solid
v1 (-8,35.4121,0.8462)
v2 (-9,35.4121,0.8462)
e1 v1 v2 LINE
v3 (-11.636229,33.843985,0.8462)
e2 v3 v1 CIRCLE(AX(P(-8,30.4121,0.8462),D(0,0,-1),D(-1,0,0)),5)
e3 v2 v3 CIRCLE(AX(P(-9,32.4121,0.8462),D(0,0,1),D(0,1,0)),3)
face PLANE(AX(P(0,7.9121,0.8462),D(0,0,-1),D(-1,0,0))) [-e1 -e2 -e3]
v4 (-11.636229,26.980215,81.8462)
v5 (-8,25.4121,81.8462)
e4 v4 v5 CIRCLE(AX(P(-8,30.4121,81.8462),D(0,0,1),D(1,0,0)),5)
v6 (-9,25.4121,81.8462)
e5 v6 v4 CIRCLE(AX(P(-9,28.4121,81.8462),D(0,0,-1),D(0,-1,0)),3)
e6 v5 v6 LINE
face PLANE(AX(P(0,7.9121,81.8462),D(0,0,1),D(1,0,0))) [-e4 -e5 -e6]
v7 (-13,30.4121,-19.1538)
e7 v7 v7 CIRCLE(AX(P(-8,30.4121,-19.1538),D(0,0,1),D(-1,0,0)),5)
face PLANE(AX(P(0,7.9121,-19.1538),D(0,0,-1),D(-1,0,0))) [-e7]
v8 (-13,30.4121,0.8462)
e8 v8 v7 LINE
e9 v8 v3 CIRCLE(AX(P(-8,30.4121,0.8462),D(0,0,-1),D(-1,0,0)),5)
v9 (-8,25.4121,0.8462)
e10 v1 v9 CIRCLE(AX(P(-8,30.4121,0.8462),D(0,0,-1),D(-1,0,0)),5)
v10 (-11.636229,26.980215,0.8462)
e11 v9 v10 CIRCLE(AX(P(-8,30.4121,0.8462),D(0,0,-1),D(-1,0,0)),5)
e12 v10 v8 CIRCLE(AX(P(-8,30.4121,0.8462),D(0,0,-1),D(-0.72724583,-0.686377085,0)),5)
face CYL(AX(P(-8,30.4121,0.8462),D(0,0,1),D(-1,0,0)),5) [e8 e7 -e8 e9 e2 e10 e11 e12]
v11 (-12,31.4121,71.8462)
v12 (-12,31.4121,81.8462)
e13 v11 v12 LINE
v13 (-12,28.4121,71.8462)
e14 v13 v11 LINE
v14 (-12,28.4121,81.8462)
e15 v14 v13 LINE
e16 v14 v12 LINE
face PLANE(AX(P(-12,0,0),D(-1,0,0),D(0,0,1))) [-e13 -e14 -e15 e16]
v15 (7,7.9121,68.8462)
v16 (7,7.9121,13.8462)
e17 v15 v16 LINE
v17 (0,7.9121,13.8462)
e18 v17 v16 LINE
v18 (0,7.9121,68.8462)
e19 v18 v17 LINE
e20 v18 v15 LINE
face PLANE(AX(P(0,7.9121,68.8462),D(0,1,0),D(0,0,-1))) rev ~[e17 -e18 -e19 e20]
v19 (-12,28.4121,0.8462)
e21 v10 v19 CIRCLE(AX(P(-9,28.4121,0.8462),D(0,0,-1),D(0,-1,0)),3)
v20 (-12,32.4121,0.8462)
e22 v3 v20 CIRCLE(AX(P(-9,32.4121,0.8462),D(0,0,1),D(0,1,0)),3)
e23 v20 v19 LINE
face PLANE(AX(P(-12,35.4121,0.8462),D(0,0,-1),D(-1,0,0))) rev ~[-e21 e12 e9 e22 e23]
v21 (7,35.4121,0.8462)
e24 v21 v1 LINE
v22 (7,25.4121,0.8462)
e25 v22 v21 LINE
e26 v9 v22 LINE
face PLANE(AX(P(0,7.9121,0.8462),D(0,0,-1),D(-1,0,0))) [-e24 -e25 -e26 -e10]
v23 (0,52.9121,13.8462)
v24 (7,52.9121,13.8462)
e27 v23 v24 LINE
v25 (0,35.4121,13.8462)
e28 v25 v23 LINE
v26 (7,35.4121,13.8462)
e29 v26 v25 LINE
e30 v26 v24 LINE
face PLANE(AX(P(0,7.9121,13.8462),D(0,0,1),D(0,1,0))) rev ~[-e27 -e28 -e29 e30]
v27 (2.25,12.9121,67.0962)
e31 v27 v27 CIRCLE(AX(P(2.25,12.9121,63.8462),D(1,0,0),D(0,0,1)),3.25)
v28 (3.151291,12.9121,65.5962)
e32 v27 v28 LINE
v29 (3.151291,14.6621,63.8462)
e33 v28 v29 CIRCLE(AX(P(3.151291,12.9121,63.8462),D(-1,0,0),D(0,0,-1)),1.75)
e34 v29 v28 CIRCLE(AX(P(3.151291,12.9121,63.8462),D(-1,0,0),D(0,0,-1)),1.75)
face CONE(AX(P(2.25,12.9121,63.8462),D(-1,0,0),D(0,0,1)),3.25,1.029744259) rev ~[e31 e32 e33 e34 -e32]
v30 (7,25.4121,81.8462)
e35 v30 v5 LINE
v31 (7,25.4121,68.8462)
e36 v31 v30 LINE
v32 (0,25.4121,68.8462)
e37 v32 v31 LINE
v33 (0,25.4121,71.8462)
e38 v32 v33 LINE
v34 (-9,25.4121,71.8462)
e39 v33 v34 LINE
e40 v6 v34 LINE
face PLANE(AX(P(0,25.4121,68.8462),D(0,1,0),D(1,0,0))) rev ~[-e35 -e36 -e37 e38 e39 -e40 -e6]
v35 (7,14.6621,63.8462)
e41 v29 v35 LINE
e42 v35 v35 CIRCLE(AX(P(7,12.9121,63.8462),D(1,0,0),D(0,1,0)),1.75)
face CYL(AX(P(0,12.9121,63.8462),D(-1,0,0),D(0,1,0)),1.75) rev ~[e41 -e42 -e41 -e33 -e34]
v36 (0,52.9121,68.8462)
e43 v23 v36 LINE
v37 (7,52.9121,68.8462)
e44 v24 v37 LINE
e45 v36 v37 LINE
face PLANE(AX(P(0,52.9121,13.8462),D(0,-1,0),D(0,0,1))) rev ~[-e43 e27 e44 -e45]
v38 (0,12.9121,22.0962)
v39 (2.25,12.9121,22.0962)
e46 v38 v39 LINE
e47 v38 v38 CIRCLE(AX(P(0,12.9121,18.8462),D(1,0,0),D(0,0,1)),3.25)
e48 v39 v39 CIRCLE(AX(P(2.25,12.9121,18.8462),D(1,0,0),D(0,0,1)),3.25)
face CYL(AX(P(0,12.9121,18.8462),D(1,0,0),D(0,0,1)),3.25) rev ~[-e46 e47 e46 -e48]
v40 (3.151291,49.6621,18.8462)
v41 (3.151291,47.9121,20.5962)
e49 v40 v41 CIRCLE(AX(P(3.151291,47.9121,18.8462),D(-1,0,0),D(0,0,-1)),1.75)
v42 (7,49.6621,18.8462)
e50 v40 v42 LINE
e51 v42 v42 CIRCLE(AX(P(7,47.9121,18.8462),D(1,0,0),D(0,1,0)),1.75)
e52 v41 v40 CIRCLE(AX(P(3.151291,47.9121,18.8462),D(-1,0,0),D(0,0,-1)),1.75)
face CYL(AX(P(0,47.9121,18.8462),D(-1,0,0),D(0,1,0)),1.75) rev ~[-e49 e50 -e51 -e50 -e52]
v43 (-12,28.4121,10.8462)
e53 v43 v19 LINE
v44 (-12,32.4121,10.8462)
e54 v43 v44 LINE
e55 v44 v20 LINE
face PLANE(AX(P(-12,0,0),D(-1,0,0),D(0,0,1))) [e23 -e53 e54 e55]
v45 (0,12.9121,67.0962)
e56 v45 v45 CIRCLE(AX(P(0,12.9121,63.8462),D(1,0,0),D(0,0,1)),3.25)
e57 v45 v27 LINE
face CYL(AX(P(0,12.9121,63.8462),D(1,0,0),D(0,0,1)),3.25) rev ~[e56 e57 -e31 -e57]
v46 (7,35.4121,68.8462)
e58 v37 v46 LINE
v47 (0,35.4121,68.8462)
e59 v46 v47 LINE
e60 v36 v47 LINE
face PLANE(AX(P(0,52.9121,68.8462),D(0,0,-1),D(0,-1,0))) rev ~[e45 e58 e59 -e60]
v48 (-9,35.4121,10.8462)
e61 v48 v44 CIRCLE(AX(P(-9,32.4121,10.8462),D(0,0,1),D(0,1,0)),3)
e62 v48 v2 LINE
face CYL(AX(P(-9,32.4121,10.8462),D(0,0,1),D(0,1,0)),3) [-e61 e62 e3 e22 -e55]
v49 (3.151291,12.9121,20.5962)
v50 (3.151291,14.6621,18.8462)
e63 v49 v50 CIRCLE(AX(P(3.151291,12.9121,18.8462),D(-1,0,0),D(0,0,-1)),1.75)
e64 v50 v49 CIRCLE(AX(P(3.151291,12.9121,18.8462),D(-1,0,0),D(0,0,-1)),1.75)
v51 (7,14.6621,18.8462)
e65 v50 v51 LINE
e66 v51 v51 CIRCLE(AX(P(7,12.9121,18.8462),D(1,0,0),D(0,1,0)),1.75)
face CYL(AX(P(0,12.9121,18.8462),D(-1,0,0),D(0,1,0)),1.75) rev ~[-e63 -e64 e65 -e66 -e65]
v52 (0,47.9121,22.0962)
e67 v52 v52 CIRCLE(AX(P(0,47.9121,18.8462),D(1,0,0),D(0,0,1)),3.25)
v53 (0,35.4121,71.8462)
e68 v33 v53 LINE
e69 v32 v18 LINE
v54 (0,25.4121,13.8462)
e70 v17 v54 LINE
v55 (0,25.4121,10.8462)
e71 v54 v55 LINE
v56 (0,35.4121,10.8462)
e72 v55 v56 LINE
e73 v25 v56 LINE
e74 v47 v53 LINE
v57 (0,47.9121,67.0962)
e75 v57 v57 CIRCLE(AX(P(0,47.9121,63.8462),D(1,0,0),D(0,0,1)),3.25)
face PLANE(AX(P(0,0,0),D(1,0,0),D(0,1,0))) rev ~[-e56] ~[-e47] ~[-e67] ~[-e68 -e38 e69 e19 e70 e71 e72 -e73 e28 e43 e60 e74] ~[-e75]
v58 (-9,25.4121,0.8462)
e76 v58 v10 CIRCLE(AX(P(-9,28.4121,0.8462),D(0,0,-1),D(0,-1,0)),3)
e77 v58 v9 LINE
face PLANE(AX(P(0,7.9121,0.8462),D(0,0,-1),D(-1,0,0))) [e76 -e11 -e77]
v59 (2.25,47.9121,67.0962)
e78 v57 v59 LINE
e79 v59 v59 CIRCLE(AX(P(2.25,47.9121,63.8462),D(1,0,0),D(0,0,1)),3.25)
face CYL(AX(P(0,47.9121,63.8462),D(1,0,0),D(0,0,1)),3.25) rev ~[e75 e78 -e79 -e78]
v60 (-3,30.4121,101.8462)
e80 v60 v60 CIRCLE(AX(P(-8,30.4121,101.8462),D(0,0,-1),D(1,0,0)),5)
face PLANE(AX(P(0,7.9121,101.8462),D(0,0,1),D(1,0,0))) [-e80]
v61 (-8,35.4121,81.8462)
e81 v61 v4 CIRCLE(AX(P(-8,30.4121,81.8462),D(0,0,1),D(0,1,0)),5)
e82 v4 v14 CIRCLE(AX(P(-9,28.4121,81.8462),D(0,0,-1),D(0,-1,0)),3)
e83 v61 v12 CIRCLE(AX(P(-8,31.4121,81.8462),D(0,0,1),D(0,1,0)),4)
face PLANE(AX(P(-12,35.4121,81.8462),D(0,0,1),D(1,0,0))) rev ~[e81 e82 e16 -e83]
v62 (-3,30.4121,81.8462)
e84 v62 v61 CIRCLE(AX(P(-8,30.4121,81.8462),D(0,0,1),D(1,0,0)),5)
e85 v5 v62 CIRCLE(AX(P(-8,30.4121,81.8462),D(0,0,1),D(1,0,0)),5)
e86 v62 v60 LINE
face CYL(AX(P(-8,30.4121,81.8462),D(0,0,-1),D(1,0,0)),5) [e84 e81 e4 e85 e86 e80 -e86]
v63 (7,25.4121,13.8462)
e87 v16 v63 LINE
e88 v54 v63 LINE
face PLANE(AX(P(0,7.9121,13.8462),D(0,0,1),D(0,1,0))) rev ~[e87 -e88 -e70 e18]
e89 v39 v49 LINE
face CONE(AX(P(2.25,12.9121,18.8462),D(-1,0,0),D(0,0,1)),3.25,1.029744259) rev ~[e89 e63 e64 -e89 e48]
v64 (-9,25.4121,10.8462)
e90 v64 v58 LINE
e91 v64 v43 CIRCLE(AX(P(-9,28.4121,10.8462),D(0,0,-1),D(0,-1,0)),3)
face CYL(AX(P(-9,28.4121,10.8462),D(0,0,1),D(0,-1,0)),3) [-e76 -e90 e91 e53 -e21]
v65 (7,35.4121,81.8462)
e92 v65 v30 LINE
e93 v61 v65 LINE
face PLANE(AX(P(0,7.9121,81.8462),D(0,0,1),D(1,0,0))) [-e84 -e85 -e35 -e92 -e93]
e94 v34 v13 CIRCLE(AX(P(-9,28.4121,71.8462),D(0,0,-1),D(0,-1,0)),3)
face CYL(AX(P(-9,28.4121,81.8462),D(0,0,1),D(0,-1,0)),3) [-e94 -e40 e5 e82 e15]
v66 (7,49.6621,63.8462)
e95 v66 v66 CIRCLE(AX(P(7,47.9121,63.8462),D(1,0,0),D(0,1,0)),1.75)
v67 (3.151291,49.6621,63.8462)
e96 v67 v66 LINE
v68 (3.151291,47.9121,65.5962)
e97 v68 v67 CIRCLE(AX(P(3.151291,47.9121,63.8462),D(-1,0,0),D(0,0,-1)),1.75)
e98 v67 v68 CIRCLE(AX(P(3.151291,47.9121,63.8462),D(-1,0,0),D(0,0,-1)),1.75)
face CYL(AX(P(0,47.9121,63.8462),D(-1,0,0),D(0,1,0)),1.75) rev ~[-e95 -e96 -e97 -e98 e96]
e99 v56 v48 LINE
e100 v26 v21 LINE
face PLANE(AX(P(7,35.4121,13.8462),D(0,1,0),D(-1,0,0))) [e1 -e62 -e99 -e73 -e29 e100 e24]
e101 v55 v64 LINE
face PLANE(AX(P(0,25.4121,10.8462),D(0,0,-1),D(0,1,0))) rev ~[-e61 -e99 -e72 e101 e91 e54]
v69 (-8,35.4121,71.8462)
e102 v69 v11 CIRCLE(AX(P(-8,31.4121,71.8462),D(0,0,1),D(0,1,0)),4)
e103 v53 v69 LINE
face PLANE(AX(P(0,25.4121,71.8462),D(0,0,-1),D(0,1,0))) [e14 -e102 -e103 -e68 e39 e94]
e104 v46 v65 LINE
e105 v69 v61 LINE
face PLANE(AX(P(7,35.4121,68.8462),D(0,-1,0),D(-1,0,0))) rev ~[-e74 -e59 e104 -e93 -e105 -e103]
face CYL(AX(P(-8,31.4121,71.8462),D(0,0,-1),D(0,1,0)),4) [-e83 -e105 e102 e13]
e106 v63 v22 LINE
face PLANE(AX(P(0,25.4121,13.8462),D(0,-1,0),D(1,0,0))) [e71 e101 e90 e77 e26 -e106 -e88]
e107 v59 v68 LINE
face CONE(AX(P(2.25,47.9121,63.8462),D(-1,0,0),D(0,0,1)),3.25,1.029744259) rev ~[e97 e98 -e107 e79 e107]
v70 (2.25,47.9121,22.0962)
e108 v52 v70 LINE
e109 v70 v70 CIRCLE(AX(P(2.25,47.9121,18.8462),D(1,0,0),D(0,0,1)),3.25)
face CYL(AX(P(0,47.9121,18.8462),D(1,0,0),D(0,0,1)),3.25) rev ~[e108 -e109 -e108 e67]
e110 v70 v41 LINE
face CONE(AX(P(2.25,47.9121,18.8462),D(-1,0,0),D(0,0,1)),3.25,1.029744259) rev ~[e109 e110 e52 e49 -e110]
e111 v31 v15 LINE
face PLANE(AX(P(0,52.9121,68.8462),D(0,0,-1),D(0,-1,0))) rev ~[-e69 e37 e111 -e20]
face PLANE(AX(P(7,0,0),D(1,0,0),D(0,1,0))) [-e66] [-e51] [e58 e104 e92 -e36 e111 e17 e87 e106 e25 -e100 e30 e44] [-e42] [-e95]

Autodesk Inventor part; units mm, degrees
ref_plane "YZ Plane" through (0, 0, 0) normal (1, 0, 0) x (0, 1, 0)
ref_plane "XZ Plane" through (0, 0, 0) normal (0, 1, 0) x (-1, 0, 0)
ref_plane "XY Plane" through (0, 0, 0) normal (0, 0, 1) x (1, 0, 0)
sketch "Skizze1" plane through (0, 0, 0) normal (1, 0, 0) x (0, 1, 0)
  line L0 (52.9121, 68.8462) -> (7.9121, 68.8462)
  line L1 (7.9121, 68.8462) -> (7.9121, 13.8462)
  line L2 (7.9121, 13.8462) -> (52.9121, 13.8462)
  line L3 (52.9121, 13.8462) -> (52.9121, 68.8462)
  circle A0 centre (12.9121, 18.8462) radius 1.75
  circle A1 centre (12.9121, 63.8462) radius 1.75
  circle A2 centre (47.9121, 63.8462) radius 1.75
  circle A3 centre (47.9121, 18.8462) radius 1.75
  point P0 (0, 0)
  dimension "d0" = 45
  dimension "d1" = 55
  dimension "d2" = 3.5
  dimension "d3" = 5
  dimension "d4" = 5
  dimension "d5" = 3.5
  dimension "d6" = 5
  dimension "d7" = 3.5
  dimension "d8" = 5
  dimension "d11" = 3.5
extrude "Extrusion1" add sketch "Skizze1" along normal blind 7
sketch "Skizze2" plane through (0, 7.9121, 68.8462) normal (0, 0, 1) x (1, 0, 0)
  line L0 (0, 45) -> (0, 0) projected
  line L1 (7, 45) -> (7, 0) projected
  line L2 (0, 17.5) -> (7, 17.5)
  line L3 (7, 17.5) -> (7, 27.5)
  line L4 (7, 27.5) -> (0, 27.5)
  line L5 (0, 27.5) -> (0, 17.5)
  line L6 (0, 45) -> (7, 45) projected
  point P0 (0, -7.9121)
  dimension "d12" = 17.5
  dimension "d13" = 10
extrude "Extrusion2" add sketch "Skizze2" along normal blind 13 contours L4 L1 L2 L0
sketch "Skizze3" plane through (0, 7.9121, 13.8462) normal (0, 0, -1) x (-1, 0, 0)
  line L0 (0, 0) -> (0, 45) projected
  line L1 (-7, 27.5) -> (0, 27.5)
  line L2 (0, 27.5) -> (0, 17.5)
  line L3 (0, 17.5) -> (-7, 17.5)
  line L4 (-7, 17.5) -> (-7, 27.5)
  line L5 (0, 0) -> (-7, 0) projected
  point P0 (0, -7.9121)
  dimension "d16" = 10
  dimension "d17" = 17.5
  dimension "d18" = 7
extrude "Extrusion3" add sketch "Skizze3" along normal blind 13
sketch "Skizze4" plane through (0, 0, 0) normal (-1, 0, 0) x (0, 0, 1)
  line L0 (13.8462, 25.4121) -> (0.8462, 25.4121) projected
  line L1 (13.8462, 35.4121) -> (0.8462, 35.4121) projected
  line L2 (0.8462, 25.4121) -> (10.8462, 25.4121)
  line L3 (10.8462, 25.4121) -> (10.8462, 35.4121)
  line L4 (10.8462, 35.4121) -> (0.8462, 35.4121)
  line L5 (0.8462, 35.4121) -> (0.8462, 25.4121)
  line L6 (81.8462, 25.4121) -> (81.8462, 35.4121) projected
  line L7 (68.8462, 35.4121) -> (81.8462, 35.4121) projected
  line L8 (81.8462, 25.4121) -> (71.8462, 25.4121)
  line L9 (71.8462, 25.4121) -> (71.8462, 35.4121)
  line L10 (71.8462, 35.4121) -> (81.8462, 35.4121)
  line L11 (81.8462, 35.4121) -> (81.8462, 25.4121)
  point P0 (0, 0)
  dimension "d21" = 10
  dimension "d22" = 10
extrude "Extrusion4" add sketch "Skizze4" along normal blind 12
sketch "Skizze5" plane through (0, 7.9121, 81.8462) normal (0, 0, 1) x (1, 0, 0)
  circle A0 centre (-8, 22.5) radius 5
  line L0 (7, 17.5) -> (-12, 17.5) projected
  line L1 (-12, 17.5) -> (-12, 27.5) projected
  point P0 (0, -7.9121)
  dimension "d25" = 10
  dimension "d26" = 5
  dimension "d27" = 4
extrude "Extrusion5" add sketch "Skizze5" along normal blind 20 contours A0 L1 | L1 A0
sketch "Skizze6" plane through (0, 7.9121, 0.8462) normal (0, 0, -1) x (-1, 0, 0)
  circle A0 centre (8, 22.5) radius 5
  line L0 (12, 27.5) -> (12, 17.5) projected
  line L1 (-7, 17.5) -> (12, 17.5) projected
  point P0 (0, -7.9121)
  dimension "d30" = 10
  dimension "d31" = 4
  dimension "d47" = 5
extrude "Extrusion6" add sketch "Skizze6" along normal blind 20 contours A0 L0 | L0 A0
fillet "Rundung1" radius 4 1 edges at (-12, 35.4121, 76.8462)
fillet "Rundung2" radius 3 3 edges at (-12, 25.4121, 76.8462) (-12, 25.4121, 5.8462) (-12, 35.4121, 5.8462)
sketch "Skizze7" plane through (0, 0, 0) normal (-1, 0, 0) x (0, 0, 1)
  circle A0 centre (18.8462, 47.9121) radius 1.75 projected
  circle A1 centre (18.8462, 12.9121) radius 1.75 projected
  circle A2 centre (63.8462, 12.9121) radius 1.75 projected
  point P0 (0, 0)
  point P1 (63.8462, 47.9121)
  dimension "d36" = 0
  dimension "d37" = 0
  dimension "d38" = 0
  dimension "d39" = 0
hole "Bohrung1" at (0, 47.9121, 18.8462) at (0, 12.9121, 18.8462) at (0, 12.9121, 63.8462) at (0, 47.9121, 63.8462) direction (1, 0, 0) diameter 6.5 depth 2.25 tip angle 118
properties part number "Paltte klein 2.0"
